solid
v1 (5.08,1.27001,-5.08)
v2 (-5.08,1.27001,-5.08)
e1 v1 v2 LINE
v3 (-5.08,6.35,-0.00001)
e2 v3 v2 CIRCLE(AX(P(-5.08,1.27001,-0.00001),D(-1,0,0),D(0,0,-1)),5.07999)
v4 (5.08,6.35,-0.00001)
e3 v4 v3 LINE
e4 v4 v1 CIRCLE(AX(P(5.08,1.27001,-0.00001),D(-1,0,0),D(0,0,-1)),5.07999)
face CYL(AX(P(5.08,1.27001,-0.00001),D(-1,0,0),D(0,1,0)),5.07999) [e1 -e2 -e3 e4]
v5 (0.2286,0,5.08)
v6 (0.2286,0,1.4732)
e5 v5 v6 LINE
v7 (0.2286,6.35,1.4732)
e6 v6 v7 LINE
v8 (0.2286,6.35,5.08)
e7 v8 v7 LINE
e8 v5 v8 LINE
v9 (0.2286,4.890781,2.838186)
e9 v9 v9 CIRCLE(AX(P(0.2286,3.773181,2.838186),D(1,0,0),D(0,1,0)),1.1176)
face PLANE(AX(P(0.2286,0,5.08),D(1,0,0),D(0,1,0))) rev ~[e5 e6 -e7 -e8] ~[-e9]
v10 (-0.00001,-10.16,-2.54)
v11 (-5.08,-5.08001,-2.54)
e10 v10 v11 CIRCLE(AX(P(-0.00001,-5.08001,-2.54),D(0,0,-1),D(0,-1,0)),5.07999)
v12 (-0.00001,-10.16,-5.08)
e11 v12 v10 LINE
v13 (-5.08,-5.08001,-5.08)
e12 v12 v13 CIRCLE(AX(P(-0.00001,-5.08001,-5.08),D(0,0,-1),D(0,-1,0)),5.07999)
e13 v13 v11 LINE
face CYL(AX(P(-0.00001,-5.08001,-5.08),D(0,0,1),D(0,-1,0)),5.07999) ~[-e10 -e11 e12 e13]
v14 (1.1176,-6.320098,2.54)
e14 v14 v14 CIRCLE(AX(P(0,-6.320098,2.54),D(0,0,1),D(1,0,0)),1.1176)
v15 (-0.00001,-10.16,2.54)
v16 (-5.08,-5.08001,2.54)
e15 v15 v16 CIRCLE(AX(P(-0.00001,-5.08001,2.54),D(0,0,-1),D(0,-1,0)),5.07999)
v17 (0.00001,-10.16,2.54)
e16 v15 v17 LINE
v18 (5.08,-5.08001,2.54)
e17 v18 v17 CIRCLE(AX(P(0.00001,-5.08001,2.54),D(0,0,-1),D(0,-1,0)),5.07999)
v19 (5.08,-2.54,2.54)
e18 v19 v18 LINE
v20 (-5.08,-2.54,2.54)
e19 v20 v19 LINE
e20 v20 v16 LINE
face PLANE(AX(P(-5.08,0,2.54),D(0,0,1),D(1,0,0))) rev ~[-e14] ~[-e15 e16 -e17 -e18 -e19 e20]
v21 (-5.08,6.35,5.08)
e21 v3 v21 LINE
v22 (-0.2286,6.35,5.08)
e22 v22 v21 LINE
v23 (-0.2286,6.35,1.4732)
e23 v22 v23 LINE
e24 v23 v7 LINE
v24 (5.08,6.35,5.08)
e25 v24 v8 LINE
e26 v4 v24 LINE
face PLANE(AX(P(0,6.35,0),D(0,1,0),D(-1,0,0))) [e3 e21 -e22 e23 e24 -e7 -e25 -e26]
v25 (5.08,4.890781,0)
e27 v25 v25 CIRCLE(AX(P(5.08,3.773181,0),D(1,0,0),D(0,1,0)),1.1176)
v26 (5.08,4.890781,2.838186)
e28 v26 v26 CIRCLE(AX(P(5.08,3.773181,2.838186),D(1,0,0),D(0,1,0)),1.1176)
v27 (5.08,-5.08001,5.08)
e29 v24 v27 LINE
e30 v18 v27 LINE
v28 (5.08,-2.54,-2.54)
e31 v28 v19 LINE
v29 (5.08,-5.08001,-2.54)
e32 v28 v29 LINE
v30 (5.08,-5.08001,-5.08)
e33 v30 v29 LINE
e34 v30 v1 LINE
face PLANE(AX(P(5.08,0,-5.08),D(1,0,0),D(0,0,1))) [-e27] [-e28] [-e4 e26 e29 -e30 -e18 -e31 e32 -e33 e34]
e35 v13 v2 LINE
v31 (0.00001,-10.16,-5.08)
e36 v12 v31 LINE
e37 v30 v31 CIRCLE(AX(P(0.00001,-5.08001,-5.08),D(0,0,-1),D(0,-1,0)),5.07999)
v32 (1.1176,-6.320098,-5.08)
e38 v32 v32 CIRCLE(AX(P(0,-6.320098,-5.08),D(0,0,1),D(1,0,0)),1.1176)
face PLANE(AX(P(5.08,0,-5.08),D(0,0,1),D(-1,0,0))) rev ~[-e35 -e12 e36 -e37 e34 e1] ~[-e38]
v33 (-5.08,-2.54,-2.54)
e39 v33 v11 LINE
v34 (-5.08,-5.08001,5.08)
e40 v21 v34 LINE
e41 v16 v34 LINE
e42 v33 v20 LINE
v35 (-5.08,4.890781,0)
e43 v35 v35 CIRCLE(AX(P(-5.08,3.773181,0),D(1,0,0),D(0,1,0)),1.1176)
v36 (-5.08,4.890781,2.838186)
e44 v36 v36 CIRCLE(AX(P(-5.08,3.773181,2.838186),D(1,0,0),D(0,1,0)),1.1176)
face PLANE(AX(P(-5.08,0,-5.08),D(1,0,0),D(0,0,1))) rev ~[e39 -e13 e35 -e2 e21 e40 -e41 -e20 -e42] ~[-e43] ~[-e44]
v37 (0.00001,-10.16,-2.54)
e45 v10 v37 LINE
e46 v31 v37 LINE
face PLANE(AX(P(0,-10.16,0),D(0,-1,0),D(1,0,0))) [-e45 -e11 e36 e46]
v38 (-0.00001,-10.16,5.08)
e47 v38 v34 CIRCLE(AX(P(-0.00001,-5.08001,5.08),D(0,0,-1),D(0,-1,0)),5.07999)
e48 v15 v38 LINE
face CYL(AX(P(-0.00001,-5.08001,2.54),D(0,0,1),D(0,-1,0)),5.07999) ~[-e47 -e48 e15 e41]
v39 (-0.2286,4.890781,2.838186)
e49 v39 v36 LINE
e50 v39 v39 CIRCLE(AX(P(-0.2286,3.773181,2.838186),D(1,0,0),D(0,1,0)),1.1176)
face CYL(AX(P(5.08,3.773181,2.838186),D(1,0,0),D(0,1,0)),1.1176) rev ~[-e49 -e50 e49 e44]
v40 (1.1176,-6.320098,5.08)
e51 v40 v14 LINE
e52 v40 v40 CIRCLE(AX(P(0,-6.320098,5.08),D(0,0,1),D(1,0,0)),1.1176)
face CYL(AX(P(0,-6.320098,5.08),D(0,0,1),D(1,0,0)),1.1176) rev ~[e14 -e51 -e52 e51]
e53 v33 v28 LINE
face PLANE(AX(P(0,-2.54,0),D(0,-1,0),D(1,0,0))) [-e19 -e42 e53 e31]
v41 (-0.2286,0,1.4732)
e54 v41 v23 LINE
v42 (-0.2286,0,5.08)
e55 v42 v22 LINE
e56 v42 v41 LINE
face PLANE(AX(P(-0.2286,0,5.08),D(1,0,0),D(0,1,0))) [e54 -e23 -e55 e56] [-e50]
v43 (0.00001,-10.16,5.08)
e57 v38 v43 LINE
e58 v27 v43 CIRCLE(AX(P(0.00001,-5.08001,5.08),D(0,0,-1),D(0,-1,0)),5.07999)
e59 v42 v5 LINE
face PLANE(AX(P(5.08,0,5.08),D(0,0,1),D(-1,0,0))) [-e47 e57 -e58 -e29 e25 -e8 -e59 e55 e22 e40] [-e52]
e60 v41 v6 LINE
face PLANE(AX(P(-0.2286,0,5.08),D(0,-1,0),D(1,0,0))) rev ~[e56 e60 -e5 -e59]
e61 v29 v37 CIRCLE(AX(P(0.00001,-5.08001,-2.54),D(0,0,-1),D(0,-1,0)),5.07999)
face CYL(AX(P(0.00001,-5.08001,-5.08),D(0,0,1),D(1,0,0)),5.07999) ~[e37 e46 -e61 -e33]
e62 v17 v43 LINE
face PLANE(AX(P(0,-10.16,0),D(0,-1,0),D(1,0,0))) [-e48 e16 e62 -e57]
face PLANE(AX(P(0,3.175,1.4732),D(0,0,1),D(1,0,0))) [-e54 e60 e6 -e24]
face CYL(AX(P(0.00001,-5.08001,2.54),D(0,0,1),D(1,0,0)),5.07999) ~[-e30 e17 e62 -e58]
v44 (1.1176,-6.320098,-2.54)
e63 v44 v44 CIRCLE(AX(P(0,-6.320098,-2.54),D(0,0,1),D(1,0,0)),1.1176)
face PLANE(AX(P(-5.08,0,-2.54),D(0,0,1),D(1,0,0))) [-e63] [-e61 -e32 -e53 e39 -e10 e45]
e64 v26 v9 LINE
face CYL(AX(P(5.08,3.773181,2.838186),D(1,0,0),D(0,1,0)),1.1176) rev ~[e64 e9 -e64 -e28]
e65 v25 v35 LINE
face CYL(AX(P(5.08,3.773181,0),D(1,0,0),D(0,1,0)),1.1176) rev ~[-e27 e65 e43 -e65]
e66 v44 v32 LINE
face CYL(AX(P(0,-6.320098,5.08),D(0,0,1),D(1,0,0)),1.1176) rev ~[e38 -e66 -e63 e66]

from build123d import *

# Parameters (mm, degrees)
F0_W      = 10.16
F0_H      = 10.16
F1_DEPTH  = 10.16
F2_T      = -2.54
F3_W      = 10.16
F3_H      = 10.16
F4_DEPTH  = 6.35
F5_R      = 1.1176
F6_DEPTH  = 10.16
F7_R      = 1.1176
F8_DEPTH  = 10.16
F9_R      = 5.07999
F10_W     = 0.4572
F10_H     = 6.35
F11_DEPTH = 3.6068


# Not quite as in the source:
# - a fillet or chamfer is up to 0.001 mm smaller than in the source, because OpenCascade refuses the exact size


with BuildPart() as f1:
    # F0 (on Front) → F1 (new body)
    with BuildSketch(Plane.XZ):
        Rectangle(F0_W, F0_H)
    extrude(amount=F1_DEPTH)

    # F2
    f2_openings = [f1.faces().sort_by_distance(p)[0] for p in [
        (0, -10.16, 0),
        (5.08, -5.08, 0),
        (-5.08, -5.08, 0),
    ]]
    offset(amount=F2_T, openings=f2_openings)

    # F3 (on face) → F4 (join)
    with BuildSketch(Plane(origin=(0, 0, 0), x_dir=(-1, 0, 0), z_dir=(0, 1, 0))):
        Rectangle(F3_W, F3_H)
    extrude(amount=F4_DEPTH)

    # F5 (on face) → F6 (cut)
    with BuildSketch(Plane.YZ.offset(5.08)):
        with Locations((3.7731814664, 0)):
            Circle(F5_R)
        with Locations((3.7731814664, 2.838186454)):
            Circle(F5_R)
    extrude(amount=-F6_DEPTH, mode=Mode.SUBTRACT)

    # F7 (on face) → F8 (cut)
    with BuildSketch(Plane.XY.offset(5.08)):
        with Locations((0, -6.3200981603)):
            Circle(F7_R)
    extrude(amount=-F8_DEPTH, mode=Mode.SUBTRACT)

    # F9 (radius 5.08 in the source; OpenCascade refuses exactly that, so slightly less here)
    f9_edges = [f1.edges().sort_by_distance(p)[0] for p in [
        (5.08, -10.16, -3.81),
        (5.08, -10.16, 3.81),
        (-5.08, -10.16, 3.81),
        (-5.08, -10.16, -3.81),
        (0, 6.35, -5.08),
    ]]
    fillet(f9_edges, radius=F9_R)

    # F10 (on face) → F11 (cut)
    with BuildSketch(Plane.XY.offset(5.08)):
        with Locations((0, 3.175)):
            Rectangle(F10_W, F10_H)
    extrude(amount=-F11_DEPTH, mode=Mode.SUBTRACT)


solid = f1.part
